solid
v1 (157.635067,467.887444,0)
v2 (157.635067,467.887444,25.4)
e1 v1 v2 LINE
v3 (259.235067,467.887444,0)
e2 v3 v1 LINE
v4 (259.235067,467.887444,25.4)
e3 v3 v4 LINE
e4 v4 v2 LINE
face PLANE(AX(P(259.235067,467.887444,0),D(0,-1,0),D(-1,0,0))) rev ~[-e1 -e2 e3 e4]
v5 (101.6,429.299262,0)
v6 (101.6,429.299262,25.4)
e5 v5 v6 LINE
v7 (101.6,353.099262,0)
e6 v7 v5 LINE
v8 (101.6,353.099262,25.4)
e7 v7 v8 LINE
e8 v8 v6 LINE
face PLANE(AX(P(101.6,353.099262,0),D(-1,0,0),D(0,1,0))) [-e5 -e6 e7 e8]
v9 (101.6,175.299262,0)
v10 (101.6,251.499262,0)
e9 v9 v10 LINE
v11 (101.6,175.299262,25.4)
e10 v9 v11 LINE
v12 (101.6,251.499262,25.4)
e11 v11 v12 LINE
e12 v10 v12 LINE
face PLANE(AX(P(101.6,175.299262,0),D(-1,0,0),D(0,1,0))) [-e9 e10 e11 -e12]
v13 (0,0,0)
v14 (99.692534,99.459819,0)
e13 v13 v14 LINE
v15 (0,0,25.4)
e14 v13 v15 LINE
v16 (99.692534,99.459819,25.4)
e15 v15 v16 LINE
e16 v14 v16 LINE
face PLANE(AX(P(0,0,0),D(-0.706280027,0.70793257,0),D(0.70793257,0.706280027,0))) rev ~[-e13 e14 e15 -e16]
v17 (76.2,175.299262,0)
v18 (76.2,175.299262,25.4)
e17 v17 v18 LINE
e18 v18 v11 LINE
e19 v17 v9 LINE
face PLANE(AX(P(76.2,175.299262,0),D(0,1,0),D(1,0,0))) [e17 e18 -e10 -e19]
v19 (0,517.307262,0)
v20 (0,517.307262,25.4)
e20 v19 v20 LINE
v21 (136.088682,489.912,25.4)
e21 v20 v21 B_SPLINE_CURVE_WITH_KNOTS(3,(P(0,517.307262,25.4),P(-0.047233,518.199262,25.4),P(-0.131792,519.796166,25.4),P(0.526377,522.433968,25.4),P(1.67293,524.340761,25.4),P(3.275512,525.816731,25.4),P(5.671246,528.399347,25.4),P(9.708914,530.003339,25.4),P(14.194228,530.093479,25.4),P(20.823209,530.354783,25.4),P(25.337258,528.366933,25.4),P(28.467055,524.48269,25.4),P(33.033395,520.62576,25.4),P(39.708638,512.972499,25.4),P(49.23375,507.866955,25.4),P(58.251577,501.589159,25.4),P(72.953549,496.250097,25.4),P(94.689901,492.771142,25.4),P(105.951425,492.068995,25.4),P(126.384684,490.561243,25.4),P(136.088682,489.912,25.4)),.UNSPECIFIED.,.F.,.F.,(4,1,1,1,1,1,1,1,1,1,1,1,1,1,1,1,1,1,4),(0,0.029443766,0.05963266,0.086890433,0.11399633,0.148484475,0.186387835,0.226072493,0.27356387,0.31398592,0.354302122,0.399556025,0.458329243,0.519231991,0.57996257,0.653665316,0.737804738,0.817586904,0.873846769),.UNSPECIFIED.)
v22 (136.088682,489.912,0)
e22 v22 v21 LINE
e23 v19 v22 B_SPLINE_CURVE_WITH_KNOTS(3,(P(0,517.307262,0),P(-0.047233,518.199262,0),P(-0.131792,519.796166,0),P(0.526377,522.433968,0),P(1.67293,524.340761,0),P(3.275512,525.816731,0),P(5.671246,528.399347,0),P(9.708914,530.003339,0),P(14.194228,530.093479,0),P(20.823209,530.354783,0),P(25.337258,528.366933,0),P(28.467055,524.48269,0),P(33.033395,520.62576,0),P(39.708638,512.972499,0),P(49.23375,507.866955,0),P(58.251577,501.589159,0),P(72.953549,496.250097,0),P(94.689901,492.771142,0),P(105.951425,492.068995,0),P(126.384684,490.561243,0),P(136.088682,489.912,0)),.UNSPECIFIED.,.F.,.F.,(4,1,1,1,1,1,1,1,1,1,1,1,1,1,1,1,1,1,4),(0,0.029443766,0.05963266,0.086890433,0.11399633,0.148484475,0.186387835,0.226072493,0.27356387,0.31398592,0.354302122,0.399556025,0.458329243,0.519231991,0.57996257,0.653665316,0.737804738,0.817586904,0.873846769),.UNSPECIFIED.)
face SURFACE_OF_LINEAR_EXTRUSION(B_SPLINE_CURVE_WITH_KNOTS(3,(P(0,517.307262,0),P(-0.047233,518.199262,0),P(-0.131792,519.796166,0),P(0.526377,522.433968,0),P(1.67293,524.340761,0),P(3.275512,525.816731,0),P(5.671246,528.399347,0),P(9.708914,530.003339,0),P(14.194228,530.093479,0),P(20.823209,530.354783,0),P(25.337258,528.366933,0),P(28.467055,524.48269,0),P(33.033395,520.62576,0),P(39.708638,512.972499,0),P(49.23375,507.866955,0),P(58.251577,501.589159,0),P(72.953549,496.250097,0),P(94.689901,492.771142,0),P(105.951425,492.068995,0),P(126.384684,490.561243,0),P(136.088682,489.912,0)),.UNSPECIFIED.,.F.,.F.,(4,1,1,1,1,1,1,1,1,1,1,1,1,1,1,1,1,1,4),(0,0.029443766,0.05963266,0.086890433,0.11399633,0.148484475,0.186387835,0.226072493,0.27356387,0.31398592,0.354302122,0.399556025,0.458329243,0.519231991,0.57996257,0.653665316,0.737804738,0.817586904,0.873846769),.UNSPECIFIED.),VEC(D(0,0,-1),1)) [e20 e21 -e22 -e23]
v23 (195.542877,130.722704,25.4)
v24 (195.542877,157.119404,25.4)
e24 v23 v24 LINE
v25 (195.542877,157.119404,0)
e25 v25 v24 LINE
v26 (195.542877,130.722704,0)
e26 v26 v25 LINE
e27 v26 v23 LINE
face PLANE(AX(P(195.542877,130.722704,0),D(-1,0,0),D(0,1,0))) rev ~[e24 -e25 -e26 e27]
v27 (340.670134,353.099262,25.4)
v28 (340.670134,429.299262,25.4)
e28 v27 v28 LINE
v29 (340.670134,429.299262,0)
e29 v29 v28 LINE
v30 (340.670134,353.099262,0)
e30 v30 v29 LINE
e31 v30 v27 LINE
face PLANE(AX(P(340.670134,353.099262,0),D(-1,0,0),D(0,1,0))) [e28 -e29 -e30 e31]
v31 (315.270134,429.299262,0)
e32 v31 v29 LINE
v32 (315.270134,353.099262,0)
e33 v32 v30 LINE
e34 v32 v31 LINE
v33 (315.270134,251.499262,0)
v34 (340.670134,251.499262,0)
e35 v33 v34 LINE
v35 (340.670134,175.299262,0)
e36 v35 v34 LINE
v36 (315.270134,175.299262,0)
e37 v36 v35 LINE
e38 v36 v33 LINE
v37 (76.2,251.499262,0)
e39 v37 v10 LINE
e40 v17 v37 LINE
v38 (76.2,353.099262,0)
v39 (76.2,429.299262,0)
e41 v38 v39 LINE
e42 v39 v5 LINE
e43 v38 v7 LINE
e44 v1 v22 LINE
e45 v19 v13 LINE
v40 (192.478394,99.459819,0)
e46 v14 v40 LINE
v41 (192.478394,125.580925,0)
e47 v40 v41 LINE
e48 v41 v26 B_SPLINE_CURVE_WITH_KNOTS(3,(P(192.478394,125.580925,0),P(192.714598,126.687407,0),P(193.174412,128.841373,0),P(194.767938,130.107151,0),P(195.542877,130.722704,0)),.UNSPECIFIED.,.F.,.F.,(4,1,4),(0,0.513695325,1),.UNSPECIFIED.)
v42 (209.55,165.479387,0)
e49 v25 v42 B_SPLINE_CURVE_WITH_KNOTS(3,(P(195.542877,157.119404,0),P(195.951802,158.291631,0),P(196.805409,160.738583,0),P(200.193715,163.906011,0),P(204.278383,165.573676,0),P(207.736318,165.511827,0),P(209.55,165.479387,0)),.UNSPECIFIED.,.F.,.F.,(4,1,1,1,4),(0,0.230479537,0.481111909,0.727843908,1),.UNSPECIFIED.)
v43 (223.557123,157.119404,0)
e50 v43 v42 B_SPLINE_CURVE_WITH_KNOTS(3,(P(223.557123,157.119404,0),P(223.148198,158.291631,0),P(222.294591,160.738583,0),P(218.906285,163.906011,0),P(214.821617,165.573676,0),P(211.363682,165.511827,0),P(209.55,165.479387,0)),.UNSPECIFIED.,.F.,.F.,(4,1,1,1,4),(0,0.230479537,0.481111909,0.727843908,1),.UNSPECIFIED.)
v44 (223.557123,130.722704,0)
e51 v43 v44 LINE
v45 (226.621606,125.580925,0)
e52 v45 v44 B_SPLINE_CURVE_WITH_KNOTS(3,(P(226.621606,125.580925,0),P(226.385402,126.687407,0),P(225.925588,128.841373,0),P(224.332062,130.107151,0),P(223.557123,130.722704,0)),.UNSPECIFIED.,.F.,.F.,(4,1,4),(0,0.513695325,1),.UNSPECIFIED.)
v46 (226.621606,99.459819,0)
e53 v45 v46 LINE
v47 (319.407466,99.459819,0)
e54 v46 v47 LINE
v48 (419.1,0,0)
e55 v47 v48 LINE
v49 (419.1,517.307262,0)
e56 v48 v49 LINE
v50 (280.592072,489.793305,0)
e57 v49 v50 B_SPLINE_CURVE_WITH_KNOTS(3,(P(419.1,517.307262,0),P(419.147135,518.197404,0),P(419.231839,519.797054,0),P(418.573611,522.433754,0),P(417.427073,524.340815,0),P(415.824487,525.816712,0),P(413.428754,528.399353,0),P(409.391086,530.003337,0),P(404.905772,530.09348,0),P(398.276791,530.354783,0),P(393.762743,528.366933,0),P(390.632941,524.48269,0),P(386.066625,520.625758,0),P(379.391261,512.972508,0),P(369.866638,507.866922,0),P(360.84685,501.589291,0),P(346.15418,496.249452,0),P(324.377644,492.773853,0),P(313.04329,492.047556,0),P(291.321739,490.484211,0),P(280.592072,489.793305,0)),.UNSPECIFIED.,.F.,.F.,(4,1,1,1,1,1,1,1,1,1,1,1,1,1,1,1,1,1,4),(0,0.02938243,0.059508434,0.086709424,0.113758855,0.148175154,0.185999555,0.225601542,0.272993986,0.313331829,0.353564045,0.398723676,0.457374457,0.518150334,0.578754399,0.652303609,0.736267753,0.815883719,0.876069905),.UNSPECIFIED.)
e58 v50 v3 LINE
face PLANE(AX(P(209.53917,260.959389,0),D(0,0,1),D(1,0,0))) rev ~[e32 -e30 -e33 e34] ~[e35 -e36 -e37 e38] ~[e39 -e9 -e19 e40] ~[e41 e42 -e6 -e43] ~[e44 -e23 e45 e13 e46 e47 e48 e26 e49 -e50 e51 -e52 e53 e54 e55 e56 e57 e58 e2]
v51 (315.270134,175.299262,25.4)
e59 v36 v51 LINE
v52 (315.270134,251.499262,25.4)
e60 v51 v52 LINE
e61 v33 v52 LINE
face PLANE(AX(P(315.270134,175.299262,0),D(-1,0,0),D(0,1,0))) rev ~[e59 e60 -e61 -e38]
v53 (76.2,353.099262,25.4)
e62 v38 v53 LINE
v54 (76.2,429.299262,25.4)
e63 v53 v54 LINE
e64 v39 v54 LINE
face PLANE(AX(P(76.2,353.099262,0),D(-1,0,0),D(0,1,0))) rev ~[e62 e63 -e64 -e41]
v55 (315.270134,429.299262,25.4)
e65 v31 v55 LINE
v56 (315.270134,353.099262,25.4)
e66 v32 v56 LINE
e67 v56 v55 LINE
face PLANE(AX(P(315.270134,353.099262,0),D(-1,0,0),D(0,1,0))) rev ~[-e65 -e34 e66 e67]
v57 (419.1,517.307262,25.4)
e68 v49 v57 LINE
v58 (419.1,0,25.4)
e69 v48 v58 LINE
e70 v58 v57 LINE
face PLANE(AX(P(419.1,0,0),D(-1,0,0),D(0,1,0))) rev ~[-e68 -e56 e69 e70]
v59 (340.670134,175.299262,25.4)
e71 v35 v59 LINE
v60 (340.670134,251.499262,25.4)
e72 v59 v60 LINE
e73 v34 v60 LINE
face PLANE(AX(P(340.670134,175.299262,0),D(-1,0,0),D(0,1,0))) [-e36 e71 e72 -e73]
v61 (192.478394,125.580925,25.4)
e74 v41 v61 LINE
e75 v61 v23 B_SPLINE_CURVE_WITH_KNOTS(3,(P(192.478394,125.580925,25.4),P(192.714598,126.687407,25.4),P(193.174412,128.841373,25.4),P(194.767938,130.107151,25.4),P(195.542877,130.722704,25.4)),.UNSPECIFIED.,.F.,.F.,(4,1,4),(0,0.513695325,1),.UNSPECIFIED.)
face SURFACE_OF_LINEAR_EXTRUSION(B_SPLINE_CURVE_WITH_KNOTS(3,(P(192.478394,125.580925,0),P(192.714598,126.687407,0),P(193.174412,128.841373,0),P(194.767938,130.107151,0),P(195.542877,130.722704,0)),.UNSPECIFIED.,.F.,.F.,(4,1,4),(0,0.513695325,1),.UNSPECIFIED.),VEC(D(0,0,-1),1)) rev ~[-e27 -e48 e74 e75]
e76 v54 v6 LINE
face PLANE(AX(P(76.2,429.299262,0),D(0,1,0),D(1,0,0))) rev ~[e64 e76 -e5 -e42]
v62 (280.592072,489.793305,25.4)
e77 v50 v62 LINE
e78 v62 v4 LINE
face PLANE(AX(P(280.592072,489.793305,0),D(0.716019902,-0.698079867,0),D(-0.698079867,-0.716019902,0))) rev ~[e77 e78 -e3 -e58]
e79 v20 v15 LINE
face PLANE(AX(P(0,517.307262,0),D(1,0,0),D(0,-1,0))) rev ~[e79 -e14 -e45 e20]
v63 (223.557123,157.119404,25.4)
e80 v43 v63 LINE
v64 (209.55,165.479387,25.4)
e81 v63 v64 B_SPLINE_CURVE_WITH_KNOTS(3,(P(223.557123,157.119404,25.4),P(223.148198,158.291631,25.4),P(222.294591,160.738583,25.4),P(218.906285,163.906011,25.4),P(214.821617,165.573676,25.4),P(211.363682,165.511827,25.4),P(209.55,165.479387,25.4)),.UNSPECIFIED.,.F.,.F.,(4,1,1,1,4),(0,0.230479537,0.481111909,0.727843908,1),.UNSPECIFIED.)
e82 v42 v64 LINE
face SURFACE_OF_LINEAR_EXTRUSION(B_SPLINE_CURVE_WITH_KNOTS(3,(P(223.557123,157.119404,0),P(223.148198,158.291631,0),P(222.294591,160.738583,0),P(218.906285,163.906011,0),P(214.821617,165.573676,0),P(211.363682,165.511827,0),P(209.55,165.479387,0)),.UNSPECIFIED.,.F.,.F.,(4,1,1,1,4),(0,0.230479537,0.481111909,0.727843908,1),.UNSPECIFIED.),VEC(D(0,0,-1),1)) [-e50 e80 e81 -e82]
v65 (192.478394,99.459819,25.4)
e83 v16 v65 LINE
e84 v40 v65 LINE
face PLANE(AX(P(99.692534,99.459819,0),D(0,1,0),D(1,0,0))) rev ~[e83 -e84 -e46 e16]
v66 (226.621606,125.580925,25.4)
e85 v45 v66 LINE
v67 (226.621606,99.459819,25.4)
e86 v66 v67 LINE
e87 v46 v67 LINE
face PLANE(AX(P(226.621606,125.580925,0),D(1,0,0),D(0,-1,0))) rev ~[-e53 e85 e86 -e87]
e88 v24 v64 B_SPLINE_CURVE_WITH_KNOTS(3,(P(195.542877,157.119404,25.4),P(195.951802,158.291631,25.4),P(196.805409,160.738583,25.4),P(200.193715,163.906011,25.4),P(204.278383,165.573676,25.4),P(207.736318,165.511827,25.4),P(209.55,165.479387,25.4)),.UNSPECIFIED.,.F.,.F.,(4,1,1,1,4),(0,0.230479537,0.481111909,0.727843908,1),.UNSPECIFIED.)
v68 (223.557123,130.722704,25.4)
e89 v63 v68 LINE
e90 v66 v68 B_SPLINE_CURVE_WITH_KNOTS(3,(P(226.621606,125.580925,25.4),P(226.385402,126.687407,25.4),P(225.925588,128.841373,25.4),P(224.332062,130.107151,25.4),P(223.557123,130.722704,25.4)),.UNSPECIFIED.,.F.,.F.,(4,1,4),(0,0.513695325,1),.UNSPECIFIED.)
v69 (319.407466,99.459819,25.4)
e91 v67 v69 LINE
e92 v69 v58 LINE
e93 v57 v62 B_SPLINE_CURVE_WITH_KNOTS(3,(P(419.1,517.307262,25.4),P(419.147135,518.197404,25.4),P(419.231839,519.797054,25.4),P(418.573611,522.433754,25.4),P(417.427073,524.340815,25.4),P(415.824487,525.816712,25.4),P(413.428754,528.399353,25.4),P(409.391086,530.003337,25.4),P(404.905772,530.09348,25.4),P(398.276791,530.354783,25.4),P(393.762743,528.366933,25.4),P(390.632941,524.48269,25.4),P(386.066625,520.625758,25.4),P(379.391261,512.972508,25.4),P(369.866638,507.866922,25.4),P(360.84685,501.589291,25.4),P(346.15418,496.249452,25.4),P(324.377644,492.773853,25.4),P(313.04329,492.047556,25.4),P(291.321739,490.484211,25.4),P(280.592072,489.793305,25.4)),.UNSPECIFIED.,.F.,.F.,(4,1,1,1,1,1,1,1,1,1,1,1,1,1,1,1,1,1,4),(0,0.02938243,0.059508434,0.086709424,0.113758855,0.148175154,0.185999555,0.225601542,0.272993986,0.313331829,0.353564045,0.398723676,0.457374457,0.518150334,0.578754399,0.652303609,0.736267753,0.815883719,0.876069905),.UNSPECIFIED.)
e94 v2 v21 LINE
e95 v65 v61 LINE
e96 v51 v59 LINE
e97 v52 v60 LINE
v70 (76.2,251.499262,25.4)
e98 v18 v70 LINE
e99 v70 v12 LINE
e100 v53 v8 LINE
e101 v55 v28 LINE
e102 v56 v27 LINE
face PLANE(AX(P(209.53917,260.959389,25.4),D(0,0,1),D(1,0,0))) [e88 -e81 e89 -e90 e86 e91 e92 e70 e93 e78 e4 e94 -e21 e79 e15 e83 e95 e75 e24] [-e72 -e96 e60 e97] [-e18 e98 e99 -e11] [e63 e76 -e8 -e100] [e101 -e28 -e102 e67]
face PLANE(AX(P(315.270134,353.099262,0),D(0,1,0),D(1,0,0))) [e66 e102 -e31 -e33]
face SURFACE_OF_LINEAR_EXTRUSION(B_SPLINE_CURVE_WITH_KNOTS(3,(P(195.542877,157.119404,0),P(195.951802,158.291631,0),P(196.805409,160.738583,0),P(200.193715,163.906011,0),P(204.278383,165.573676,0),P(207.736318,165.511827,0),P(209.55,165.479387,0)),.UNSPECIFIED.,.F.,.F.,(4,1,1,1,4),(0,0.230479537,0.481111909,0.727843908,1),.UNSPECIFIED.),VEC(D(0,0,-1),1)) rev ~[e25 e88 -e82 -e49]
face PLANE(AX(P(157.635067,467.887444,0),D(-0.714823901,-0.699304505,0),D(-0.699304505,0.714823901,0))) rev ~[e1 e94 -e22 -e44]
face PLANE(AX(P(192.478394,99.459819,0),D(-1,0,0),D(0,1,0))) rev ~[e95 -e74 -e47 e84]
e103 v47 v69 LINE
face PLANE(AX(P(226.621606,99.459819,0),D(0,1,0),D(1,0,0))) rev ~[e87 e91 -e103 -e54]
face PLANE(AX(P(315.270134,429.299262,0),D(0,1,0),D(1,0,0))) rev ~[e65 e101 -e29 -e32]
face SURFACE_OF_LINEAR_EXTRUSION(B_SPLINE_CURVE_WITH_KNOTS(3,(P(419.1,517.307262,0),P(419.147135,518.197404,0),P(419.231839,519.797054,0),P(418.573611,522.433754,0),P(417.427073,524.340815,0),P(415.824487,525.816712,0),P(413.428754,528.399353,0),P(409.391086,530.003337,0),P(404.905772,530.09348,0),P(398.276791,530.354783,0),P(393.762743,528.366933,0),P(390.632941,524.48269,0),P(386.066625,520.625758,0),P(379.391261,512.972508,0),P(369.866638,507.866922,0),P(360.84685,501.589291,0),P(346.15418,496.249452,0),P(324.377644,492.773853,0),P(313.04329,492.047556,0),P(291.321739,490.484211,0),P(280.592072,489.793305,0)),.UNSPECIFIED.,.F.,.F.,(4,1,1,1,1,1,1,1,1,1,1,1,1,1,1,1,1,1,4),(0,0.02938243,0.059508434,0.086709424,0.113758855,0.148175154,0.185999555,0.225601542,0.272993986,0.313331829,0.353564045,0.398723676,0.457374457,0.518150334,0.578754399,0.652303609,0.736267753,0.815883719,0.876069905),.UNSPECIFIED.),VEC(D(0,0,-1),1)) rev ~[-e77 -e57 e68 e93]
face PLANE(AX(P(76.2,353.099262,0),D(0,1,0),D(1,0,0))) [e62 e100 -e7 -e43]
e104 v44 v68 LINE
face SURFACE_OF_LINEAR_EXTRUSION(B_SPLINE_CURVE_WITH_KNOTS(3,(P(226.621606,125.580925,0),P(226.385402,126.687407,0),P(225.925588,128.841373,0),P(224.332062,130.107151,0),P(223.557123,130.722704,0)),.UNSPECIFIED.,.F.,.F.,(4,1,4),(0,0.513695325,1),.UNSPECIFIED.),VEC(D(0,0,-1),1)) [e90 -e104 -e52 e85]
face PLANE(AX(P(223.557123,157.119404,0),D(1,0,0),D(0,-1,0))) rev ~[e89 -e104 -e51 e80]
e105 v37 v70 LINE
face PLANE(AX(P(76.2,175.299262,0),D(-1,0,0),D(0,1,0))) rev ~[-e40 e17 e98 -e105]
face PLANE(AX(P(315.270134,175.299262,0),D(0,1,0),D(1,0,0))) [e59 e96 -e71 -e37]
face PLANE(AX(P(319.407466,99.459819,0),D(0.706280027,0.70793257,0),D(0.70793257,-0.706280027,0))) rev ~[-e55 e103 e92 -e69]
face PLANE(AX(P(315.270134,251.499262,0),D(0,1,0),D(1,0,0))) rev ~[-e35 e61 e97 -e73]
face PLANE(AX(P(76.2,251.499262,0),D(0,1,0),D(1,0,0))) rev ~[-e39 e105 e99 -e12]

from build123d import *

# Parameters (mm, degrees)
F0_W     = 25.4
F0_H     = 76.2
F1_DEPTH = 25.4


with BuildPart() as f1:
    # F0 (on Top) → F1 (new body)
    with BuildSketch(Plane.XY):
        with BuildLine():
            Line((419.1, 0), (419.1, 29.1582643986))
            Line((419.1, 29.1582643986), (419.1, 517.3072619364))
            add(Edge.make_bspline(
                [(419.1, 517.3072619364), (419.147134559, 518.1974042934), (419.2318387678, 519.7970544265), (418.5736114874, 522.4337537795), (417.4270728627, 524.340815455), (415.824487225, 525.8167119843), (413.4287542387, 528.3993527548), (409.391086273, 530.0033373842), (404.9057722898, 530.0934799636), (398.2767909208, 530.3547825459), (393.7627427273, 528.3669327043), (390.6329406281, 524.4826903766), (386.0666251069, 520.6257581861), (379.3912610246, 512.9725078822), (369.8666381536, 507.866922061), (360.8468497656, 501.5892907558), (346.1541795146, 496.249451646), (324.3776438612, 492.7738532505), (313.0432898306, 492.0475559722), (291.3217386764, 490.4842105973), (280.5920723689, 489.7933052515)],
                knots=[0, 0, 0, 0, 0.0293824295, 0.0595084345, 0.0867094239, 0.1137588548, 0.1481751544, 0.1859995547, 0.2256015417, 0.272993986, 0.3133318288, 0.3535640445, 0.3987236757, 0.4573744575, 0.5181503343, 0.5787543994, 0.6523036094, 0.7362677531, 0.8158837187, 0.8760699048, 0.8760699048, 0.8760699048, 0.8760699048], degree=3))
            Line((280.5920723689, 489.7933052515), (259.2350669765, 467.8874437258))
            Line((259.2350669765, 467.8874437258), (208.4350669765, 467.8874437258))
            Line((208.4350669765, 467.8874437258), (157.6350669765, 467.8874437258))
            Line((157.6350669765, 467.8874437258), (136.0886816558, 489.9119997113))
            add(Edge.make_bspline(
                [(0, 517.3072619364), (-0.047232954, 518.1992624967), (-0.1317917187, 519.7961658976), (0.526377146, 522.4339684383), (1.6729300089, 524.3407612277), (3.2755117734, 525.8167308821), (5.6712460924, 528.3993465881), (9.7089136128, 530.0033391805), (14.1942278227, 530.0934793681), (20.8232087283, 530.3547826623), (25.3372583383, 528.3669327573), (28.4670551881, 524.4826900379), (33.0333949249, 520.6257598555), (39.7086378543, 512.9724994358), (49.233750463, 507.8669545255), (58.2515767921, 501.5891593114), (72.9535489254, 496.2500972756), (94.6899012537, 492.7711419872), (105.9514249536, 492.0689950432), (126.384684191, 490.5612427498), (136.0886816558, 489.9119997113)],
                knots=[0, 0, 0, 0, 0.0294437663, 0.0596326604, 0.0868904328, 0.1139963304, 0.1484844752, 0.1863878353, 0.2260724928, 0.2735638704, 0.3139859199, 0.3543021218, 0.3995560253, 0.4583292427, 0.5192319912, 0.5799625695, 0.6536653159, 0.7378047377, 0.8175869044, 0.8738467686, 0.8738467686, 0.8738467686, 0.8738467686], degree=3))
            Line((0, 517.3072619364), (0, 29.1582643986))
            Line((0, 29.1582643986), (0, 0))
            Line((0, 0), (99.6925341323, 99.4598194957))
            Line((99.6925341323, 99.4598194957), (181.0018675759, 99.4598194957))
            Line((181.0018675759, 99.4598194957), (192.4783936119, 99.4598194957))
            Line((192.4783936119, 99.4598194957), (192.4783936119, 125.5809245631))
            add(Edge.make_bspline(
                [(192.4783936119, 125.5809245631), (192.7145980862, 126.6874069404), (193.1744124211, 128.8413731597), (194.7679380521, 130.1071507729), (195.5428770161, 130.7227043435)],
                knots=[0, 0, 0, 0, 0.5136953251, 1, 1, 1, 1], degree=3))
            Line((195.5428770161, 130.7227043435), (195.5428770161, 157.1194035932))
            add(Edge.make_bspline(
                [(195.5428770161, 157.1194035932), (195.9518024102, 158.2916305791), (196.8054091098, 160.7385825731), (200.1937150151, 163.9060107886), (204.2783832523, 165.573676434), (207.7363179785, 165.5118270656), (209.55, 165.4793871567)],
                knots=[0, 0, 0, 0, 0.2304795373, 0.4811119095, 0.7278439081, 1, 1, 1, 1], degree=3))
            add(Edge.make_bspline(
                [(223.5571229839, 157.1194035932), (223.1481975898, 158.2916305791), (222.2945908902, 160.7385825731), (218.9062849849, 163.9060107886), (214.8216167477, 165.573676434), (211.3636820215, 165.5118270656), (209.55, 165.4793871567)],
                knots=[0, 0, 0, 0, 0.2304795373, 0.4811119095, 0.7278439081, 1, 1, 1, 1], degree=3))
            Line((223.5571229839, 157.1194035932), (223.5571229839, 130.7227043435))
            add(Edge.make_bspline(
                [(226.6216063881, 125.5809245631), (226.3854019138, 126.6874069404), (225.9255875789, 128.8413731597), (224.3320619479, 130.1071507729), (223.5571229839, 130.7227043435)],
                knots=[0, 0, 0, 0, 0.5136953251, 1, 1, 1, 1], degree=3))
            Line((226.6216063881, 125.5809245631), (226.6216063881, 99.4598194957))
            Line((226.6216063881, 99.4598194957), (238.0981324241, 99.4598194957))
            Line((238.0981324241, 99.4598194957), (319.4074658677, 99.4598194957))
            Line((319.4074658677, 99.4598194957), (419.1, 0))
        make_face()
        with Locations((88.9, 213.3992624967)):
            Rectangle(F0_W, F0_H, mode=Mode.SUBTRACT)
        with Locations((327.9701339531, 213.3992624967)):
            Rectangle(F0_W, F0_H, mode=Mode.SUBTRACT)
        with Locations((88.9, 391.1992624967)):
            Rectangle(F0_W, F0_H, mode=Mode.SUBTRACT)
        with Locations((327.9701339531, 391.1992624967)):
            Rectangle(F0_W, F0_H, mode=Mode.SUBTRACT)
    extrude(amount=F1_DEPTH)


solid = f1.part
